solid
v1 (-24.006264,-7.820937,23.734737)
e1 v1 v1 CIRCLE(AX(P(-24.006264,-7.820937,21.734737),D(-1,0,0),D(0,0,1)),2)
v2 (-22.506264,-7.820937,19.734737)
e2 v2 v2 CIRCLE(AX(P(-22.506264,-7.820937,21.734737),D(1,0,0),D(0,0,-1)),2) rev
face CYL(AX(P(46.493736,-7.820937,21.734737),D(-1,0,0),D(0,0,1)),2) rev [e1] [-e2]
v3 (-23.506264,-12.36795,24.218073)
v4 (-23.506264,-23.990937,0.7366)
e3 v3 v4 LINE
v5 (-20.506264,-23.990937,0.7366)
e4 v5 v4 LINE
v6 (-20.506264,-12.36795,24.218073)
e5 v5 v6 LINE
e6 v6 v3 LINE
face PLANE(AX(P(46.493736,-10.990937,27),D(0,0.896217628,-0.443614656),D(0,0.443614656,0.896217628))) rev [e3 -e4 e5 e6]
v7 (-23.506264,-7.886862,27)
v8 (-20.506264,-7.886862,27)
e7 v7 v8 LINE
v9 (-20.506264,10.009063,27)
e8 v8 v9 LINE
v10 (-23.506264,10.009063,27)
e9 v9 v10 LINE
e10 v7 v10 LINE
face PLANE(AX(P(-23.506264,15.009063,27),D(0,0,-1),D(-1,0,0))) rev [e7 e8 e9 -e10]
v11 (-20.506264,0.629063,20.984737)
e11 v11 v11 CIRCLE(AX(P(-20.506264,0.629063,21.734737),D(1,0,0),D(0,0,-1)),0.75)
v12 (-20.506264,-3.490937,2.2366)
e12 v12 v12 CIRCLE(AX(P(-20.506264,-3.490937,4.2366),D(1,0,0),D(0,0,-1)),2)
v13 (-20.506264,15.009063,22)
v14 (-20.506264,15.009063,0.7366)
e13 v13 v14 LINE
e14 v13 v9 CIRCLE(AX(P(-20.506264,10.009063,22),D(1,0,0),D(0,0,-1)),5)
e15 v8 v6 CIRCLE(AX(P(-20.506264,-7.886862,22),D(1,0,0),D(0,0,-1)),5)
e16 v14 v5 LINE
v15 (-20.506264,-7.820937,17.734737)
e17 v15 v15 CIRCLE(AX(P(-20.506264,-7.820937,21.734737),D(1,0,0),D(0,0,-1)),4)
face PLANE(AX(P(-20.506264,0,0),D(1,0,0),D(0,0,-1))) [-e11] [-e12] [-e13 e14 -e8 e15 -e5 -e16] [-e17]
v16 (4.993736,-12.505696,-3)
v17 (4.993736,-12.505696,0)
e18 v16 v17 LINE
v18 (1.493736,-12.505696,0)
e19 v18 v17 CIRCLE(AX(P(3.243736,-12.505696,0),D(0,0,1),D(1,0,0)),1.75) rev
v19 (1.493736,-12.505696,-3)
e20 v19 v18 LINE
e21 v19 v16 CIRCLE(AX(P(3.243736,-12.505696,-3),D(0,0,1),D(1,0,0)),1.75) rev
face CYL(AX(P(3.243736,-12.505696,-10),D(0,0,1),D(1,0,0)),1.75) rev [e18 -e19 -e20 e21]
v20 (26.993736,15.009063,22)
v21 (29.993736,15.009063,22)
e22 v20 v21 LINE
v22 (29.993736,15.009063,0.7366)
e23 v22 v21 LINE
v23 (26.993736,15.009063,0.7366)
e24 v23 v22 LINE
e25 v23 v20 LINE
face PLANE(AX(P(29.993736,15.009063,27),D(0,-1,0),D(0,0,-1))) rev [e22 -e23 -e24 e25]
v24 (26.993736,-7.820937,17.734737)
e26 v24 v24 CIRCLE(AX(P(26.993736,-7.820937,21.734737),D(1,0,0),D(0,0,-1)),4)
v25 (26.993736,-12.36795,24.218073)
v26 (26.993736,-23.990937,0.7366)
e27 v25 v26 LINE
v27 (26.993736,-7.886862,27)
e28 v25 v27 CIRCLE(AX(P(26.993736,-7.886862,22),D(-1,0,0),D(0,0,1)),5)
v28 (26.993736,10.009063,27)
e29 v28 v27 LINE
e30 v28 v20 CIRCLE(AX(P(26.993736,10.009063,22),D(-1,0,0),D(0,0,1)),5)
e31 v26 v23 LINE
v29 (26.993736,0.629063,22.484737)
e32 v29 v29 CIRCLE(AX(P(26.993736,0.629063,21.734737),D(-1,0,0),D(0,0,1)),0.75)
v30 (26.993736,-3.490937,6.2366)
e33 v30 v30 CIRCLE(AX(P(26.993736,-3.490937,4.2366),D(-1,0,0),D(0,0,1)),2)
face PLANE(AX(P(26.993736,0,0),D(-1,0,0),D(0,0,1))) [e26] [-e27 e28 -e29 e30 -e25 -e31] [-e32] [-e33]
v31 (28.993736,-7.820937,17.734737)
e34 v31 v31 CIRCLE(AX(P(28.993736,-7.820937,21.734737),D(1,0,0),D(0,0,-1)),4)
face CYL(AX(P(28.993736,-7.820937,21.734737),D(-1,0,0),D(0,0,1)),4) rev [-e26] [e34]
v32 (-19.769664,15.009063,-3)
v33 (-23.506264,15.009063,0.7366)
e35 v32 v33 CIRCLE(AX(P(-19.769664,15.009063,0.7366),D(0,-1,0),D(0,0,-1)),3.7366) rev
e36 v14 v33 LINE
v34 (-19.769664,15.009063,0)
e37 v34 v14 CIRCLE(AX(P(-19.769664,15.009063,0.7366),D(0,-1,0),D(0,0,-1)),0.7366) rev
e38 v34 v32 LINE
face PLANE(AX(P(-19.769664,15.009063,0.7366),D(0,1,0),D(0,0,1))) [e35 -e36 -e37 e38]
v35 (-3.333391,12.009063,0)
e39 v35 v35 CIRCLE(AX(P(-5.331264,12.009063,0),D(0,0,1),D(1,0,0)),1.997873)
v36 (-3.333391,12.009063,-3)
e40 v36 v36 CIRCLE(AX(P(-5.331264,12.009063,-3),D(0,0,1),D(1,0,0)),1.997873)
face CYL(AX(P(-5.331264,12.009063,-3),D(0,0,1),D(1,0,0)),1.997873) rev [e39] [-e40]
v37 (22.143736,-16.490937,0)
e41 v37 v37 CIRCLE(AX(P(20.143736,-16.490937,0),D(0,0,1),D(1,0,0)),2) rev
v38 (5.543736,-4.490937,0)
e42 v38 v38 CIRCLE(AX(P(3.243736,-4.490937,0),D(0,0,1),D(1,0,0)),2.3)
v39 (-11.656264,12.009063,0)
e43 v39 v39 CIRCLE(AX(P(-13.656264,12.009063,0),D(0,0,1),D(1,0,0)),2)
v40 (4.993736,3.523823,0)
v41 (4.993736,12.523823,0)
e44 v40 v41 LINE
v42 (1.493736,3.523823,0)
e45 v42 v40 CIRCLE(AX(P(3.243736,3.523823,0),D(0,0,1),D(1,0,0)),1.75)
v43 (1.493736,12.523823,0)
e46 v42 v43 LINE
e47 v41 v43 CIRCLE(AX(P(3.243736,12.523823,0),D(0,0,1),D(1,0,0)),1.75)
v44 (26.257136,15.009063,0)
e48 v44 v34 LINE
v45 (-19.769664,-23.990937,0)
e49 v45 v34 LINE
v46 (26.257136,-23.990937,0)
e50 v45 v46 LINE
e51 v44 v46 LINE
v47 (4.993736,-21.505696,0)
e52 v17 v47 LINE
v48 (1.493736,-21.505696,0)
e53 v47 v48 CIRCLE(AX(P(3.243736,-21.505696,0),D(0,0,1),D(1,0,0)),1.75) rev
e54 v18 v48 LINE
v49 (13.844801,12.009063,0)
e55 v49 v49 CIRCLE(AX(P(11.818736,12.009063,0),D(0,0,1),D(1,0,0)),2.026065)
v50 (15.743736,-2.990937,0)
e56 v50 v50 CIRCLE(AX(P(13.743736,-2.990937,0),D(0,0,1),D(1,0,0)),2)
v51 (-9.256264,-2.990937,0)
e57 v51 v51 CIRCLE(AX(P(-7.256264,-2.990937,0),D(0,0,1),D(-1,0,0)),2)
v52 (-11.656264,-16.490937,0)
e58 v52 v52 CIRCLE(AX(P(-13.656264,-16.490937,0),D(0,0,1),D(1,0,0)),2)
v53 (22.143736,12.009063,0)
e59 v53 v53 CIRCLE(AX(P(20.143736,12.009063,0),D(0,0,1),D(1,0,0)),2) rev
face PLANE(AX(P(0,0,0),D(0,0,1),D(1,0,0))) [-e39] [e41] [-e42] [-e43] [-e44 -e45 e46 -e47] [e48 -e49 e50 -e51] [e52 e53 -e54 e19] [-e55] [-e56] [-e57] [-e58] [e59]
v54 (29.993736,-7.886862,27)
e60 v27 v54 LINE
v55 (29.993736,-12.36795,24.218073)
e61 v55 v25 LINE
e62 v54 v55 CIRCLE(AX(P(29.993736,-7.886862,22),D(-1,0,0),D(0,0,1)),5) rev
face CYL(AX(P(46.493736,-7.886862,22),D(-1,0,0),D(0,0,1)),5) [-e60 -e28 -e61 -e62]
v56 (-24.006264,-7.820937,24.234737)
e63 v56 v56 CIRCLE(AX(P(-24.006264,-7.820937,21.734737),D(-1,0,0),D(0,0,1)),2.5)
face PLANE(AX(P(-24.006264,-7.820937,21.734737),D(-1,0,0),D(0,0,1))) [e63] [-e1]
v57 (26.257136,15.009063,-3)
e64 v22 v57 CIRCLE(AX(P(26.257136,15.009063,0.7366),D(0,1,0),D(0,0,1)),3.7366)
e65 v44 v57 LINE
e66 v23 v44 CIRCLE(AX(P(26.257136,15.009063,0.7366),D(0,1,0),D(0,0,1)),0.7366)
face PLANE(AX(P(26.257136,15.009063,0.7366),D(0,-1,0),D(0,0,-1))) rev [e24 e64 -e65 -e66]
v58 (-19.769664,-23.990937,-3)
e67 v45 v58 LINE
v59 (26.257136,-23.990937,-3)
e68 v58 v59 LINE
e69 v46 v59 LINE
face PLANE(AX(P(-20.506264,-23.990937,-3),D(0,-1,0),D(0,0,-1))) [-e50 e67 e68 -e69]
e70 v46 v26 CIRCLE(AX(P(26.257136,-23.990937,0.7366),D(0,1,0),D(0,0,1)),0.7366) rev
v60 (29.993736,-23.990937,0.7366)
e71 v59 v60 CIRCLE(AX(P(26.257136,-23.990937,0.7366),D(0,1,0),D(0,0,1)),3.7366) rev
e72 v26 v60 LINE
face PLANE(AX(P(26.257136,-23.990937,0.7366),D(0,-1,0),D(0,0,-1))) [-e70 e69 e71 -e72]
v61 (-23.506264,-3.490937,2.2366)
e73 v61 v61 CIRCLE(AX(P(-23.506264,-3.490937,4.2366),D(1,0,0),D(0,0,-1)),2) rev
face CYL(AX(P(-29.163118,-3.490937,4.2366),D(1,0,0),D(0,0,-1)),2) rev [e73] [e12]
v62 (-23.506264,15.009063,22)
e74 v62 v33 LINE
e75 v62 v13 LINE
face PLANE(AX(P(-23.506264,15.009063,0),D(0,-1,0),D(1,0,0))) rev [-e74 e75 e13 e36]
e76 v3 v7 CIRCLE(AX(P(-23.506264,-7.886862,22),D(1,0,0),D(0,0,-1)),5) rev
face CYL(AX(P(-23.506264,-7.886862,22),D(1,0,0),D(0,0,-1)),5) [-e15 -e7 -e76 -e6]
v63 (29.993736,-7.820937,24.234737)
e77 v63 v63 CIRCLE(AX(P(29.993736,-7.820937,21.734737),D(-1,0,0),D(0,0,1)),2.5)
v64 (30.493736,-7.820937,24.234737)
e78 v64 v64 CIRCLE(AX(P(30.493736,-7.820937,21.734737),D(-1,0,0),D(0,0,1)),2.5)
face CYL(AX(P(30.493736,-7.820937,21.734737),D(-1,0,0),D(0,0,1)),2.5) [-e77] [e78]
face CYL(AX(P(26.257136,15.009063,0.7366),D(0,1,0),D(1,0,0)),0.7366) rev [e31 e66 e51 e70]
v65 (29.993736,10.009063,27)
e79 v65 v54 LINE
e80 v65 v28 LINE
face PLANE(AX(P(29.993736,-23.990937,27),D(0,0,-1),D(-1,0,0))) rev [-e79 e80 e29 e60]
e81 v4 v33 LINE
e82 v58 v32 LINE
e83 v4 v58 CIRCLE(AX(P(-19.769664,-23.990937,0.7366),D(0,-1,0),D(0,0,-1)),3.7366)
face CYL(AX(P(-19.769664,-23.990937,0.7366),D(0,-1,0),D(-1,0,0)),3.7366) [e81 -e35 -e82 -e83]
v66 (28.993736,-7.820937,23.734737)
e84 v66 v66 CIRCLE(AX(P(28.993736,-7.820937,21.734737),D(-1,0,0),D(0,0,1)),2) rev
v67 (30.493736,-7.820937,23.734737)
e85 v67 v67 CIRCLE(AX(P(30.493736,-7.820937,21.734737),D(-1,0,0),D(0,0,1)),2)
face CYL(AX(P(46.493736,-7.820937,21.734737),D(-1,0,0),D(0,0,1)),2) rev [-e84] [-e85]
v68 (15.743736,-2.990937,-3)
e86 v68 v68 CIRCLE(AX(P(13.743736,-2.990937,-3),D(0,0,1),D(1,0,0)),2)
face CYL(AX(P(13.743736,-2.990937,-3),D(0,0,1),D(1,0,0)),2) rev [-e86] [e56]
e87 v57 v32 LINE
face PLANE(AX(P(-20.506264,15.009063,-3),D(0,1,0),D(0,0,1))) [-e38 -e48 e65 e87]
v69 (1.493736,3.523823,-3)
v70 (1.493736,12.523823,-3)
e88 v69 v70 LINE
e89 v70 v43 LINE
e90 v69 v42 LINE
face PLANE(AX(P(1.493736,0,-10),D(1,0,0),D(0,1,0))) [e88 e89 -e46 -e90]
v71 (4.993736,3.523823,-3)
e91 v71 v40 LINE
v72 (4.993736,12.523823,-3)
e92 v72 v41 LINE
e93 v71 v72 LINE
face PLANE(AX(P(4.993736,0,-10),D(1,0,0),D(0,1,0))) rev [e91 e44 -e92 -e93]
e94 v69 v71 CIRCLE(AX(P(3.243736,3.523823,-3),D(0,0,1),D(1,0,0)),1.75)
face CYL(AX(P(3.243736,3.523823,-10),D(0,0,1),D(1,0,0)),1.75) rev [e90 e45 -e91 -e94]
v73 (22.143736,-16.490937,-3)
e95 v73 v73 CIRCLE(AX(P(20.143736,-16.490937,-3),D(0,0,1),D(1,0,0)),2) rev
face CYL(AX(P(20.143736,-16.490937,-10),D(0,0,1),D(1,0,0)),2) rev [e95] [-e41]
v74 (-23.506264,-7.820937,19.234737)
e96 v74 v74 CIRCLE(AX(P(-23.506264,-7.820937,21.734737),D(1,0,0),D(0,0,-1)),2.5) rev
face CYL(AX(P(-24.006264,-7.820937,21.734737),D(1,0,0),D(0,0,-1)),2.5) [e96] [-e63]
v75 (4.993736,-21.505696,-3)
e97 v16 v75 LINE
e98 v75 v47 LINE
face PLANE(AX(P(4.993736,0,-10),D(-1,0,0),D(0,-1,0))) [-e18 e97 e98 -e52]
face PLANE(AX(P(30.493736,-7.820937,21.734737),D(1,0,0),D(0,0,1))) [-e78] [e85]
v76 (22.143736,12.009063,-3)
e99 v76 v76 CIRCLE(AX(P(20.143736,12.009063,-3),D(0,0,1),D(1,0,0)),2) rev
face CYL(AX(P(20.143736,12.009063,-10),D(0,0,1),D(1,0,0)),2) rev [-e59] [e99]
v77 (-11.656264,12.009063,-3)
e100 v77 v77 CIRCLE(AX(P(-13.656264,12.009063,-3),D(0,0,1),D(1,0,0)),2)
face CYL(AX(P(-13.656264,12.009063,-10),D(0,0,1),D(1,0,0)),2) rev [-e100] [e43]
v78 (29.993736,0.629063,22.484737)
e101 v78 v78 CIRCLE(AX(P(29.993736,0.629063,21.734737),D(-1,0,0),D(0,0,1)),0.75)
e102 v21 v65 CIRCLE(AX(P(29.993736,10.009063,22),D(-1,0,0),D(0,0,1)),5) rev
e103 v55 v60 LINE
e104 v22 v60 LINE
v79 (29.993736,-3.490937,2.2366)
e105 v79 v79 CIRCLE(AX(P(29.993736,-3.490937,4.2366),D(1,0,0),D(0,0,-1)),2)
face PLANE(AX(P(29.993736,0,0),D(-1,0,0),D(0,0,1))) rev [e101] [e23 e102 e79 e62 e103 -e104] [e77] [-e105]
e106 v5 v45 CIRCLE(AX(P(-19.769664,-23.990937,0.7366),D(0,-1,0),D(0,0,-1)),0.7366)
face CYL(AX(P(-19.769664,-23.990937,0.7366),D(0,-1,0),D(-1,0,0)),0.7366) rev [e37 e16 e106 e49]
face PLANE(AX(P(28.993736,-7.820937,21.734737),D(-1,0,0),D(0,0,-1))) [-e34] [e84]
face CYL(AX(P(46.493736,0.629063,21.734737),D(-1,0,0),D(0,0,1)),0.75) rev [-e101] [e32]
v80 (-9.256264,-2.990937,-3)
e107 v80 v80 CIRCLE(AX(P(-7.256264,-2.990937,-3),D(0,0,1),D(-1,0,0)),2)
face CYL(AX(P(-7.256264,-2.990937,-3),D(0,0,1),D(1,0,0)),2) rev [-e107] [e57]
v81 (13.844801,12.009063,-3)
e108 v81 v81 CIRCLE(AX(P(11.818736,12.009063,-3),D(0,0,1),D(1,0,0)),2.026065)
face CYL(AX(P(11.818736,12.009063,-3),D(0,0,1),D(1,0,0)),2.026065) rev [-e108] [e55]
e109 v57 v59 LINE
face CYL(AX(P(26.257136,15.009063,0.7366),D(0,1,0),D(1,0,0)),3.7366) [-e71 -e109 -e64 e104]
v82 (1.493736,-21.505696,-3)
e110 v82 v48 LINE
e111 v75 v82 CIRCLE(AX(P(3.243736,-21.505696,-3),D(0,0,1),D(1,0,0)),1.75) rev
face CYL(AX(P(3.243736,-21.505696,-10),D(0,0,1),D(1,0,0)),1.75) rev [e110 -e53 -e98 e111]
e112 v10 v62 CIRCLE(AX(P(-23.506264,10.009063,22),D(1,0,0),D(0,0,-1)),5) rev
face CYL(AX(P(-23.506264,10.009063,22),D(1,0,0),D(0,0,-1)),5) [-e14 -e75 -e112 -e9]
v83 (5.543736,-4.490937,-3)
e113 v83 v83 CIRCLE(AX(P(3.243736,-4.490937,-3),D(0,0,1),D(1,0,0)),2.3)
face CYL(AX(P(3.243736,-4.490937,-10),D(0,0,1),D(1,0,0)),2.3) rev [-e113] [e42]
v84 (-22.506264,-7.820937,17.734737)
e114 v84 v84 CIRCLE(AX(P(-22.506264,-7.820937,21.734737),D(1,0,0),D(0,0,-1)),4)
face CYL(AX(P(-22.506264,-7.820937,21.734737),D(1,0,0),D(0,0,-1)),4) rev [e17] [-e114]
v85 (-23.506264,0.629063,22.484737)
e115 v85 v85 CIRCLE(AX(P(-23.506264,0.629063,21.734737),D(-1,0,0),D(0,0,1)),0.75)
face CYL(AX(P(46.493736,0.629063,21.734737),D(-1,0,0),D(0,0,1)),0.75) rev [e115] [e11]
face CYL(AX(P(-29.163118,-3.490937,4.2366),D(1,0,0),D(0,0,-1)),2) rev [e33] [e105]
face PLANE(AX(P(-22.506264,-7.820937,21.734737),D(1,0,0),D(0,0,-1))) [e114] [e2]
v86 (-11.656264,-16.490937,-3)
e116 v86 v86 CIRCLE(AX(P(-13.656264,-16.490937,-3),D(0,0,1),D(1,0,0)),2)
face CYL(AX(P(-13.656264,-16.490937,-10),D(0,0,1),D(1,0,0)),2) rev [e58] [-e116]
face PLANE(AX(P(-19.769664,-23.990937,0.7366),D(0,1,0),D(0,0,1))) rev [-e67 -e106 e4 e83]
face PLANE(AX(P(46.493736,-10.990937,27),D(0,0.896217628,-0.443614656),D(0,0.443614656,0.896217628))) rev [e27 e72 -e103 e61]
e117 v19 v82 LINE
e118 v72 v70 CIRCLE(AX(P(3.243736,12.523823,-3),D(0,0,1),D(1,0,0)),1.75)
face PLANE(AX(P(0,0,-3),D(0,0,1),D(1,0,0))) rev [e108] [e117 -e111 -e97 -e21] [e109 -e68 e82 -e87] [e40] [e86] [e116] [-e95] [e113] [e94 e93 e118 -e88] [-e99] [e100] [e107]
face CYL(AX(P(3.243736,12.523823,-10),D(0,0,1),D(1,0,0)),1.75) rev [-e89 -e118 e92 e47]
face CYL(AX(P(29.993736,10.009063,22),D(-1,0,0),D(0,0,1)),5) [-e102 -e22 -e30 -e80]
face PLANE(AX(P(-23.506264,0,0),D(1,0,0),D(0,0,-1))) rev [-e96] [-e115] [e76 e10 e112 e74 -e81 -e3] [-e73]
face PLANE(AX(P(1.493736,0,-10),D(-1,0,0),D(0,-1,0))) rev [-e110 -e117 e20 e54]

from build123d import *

# Parameters (mm, degrees)
ESBO_O1_W                        = 47.5
ESBO_O1_H                        = 39
FLANGE_BASE1_DEPTH               = 3
ESBO_O6_R                        = 2.3
CORTE_EXTRUS_O1_DEPTH            = 10
ARESTA_FLANGE1_STRIP_W           = 13.4732
ARESTA_FLANGE1_STRIP_H           = 3
ARESTA_FLANGE1_STRIP_CUT_DEPTH   = 39
ARESTA_FLANGE1_STRIP_2_W         = 13.4732
ARESTA_FLANGE1_STRIP_2_H         = 3
ARESTA_FLANGE1_STRIP_CUT_2_DEPTH = 39
ARESTA_FLANGE1_DEPTH             = 39
ARESTA_FLANGE1_BEND_DEPTH        = 39
ESBO_O13_R                       = 2
ESBO_O13_R_2                     = 0.75
CORTE_EXTRUS_O2_DEPTH            = 70
FILETE1_R                        = 5
ESBO_O14_R                       = 1.997873176
ESBO_O14_R_2                     = 2.026064888
ESBO_O14_R_3                     = 2
CORTE_EXTRUS_O4_DEPTH            = 3
BOSS_EXTRUDE1_START              = 0.5
SKETCH1_R                        = 2.5
SKETCH1_R_2                      = 2
BOSS_EXTRUDE1_DEPTH              = 0.5
SKETCH2_R                        = 4
CUT_EXTRUDE8_DEPTH               = 2
CORTE_EXTRUS_O5_REACH            = 66.966
ESBO_O15_R                       = 2


# Sheet-metal steps are written as plain solids
with BuildPart() as part:
    # Esboço1 → Flange-base1 (new body)
    with BuildSketch(Plane.XY):
        with Locations((3.243735783, -4.490936556)):
            Rectangle(ESBO_O1_W, ESBO_O1_H)
    extrude(amount=-FLANGE_BASE1_DEPTH)

    # Esboço6 → Corte-extrusão1 (cut)
    with BuildSketch(Plane.XY):
        with BuildLine():
            Line((-13.656264217, 10.009063444), (-13.656264217, 12.009063444))
            Line((-13.656264217, 12.009063444), (-11.656264217, 12.009063444))
            ThreePointArc((-11.656264217, 12.009063444), (-15.070477779, 13.423277006), (-13.656264217, 10.009063444))
        make_face()
        with BuildLine():
            Line((-11.656264217, 12.009063444), (-13.656264217, 12.009063444))
            Line((-13.656264217, 12.009063444), (-13.656264217, 10.009063444))
            ThreePointArc((-13.656264217, 10.009063444), (-12.242050654, 10.594849882), (-11.656264217, 12.009063444))
        make_face()
        with BuildLine():
            ThreePointArc((-11.656264217, -16.490936556), (-12.242050654, -15.076722994), (-13.656264217, -14.490936556))
            Line((-13.656264217, -14.490936556), (-13.656264217, -16.490936556))
            Line((-13.656264217, -16.490936556), (-11.656264217, -16.490936556))
        make_face()
        with BuildLine():
            Line((-13.656264217, -16.490936556), (-13.656264217, -14.490936556))
            ThreePointArc((-13.656264217, -14.490936556), (-15.070477779, -17.905150118), (-11.656264217, -16.490936556))
            Line((-11.656264217, -16.490936556), (-13.656264217, -16.490936556))
        make_face()
        with Locations((3.243735783, -4.490936556)):
            Circle(ESBO_O6_R)
        with BuildLine():
            Line((4.993735783, 12.009063444), (1.493735783, 12.009063444))
            Line((1.493735783, 12.009063444), (1.493735783, 3.523823043))
            ThreePointArc((1.493735783, 3.523823043), (3.243735783, 1.773823043), (4.993735783, 3.523823043))
            Line((4.993735783, 3.523823043), (4.993735783, 12.009063444))
        make_face()
        with BuildLine():
            Line((1.493735783, 12.523823043), (1.493735783, 12.009063444))
            Line((1.493735783, 12.009063444), (4.993735783, 12.009063444))
            Line((4.993735783, 12.009063444), (4.993735783, 12.523823043))
            ThreePointArc((4.993735783, 12.523823043), (3.243735783, 14.273823043), (1.493735783, 12.523823043))
        make_face()
        with BuildLine():
            Line((1.493735783, -12.505696155), (1.493735783, -16.490936556))
            Line((1.493735783, -16.490936556), (4.993735783, -16.490936556))
            Line((4.993735783, -16.490936556), (4.993735783, -12.505696155))
            ThreePointArc((4.993735783, -12.505696155), (3.243735783, -10.755696155), (1.493735783, -12.505696155))
        make_face()
        with BuildLine():
            Line((4.993735783, -16.490936556), (1.493735783, -16.490936556))
            Line((1.493735783, -16.490936556), (1.493735783, -21.505696155))
            ThreePointArc((1.493735783, -21.505696155), (3.243735783, -23.255696155), (4.993735783, -21.505696155))
            Line((4.993735783, -21.505696155), (4.993735783, -16.490936556))
        make_face()
        with BuildLine():
            ThreePointArc((22.143735783, -16.490936556), (21.557949346, -15.076722994), (20.143735783, -14.490936556))
            Line((20.143735783, -14.490936556), (20.143735783, -16.490936556))
            Line((20.143735783, -16.490936556), (18.143735783, -16.490936556))
            ThreePointArc((18.143735783, -16.490936556), (20.143735783, -18.490936556), (22.143735783, -16.490936556))
        make_face()
        with BuildLine():
            Line((20.143735783, -16.490936556), (20.143735783, -14.490936556))
            ThreePointArc((20.143735783, -14.490936556), (18.729522221, -15.076722994), (18.143735783, -16.490936556))
            Line((18.143735783, -16.490936556), (20.143735783, -16.490936556))
        make_face()
        with BuildLine():
            ThreePointArc((22.143735783, 12.009063444), (20.143735783, 14.009063444), (18.143735783, 12.009063444))
            Line((18.143735783, 12.009063444), (20.143735783, 12.009063444))
            Line((20.143735783, 12.009063444), (20.143735783, 10.009063444))
            ThreePointArc((20.143735783, 10.009063444), (21.557949346, 10.594849882), (22.143735783, 12.009063444))
        make_face()
        with BuildLine():
            Line((20.143735783, 12.009063444), (18.143735783, 12.009063444))
            ThreePointArc((18.143735783, 12.009063444), (18.729522221, 10.594849882), (20.143735783, 10.009063444))
            Line((20.143735783, 10.009063444), (20.143735783, 12.009063444))
        make_face()
    extrude(amount=-CORTE_EXTRUS_O1_DEPTH, mode=Mode.SUBTRACT)

    # Aresta-Flange1 strip (across the edge) → Aresta-Flange1 strip cut (cut)
    with BuildSketch(Plane(origin=(26.993735783, -23.990936556, 0), x_dir=(-1, 0, 0), z_dir=(0, 1, 0))):
        with Locations((-6, -1.5)):
            Rectangle(ARESTA_FLANGE1_STRIP_W, ARESTA_FLANGE1_STRIP_H)
    extrude(amount=ARESTA_FLANGE1_STRIP_CUT_DEPTH, mode=Mode.SUBTRACT)

    # Aresta-Flange1 strip 2 (across the edge) → Aresta-Flange1 strip cut 2 (cut)
    with BuildSketch(Plane(origin=(-20.506264217, 15.009063444, 0), x_dir=(1, 0, 0), z_dir=(0, -1, 0))):
        with Locations((-6, -1.5)):
            Rectangle(ARESTA_FLANGE1_STRIP_2_W, ARESTA_FLANGE1_STRIP_2_H)
    extrude(amount=ARESTA_FLANGE1_STRIP_CUT_2_DEPTH, mode=Mode.SUBTRACT)

    # Aresta-Flange1 section (across the edge) → Aresta-Flange1 (add)
    with BuildSketch(Plane(origin=(26.993735783, -23.990936556, 0), x_dir=(-1, 0, 0), z_dir=(0, 1, 0))):
        with BuildLine():
            Line((-3, 0.7366), (-3, 27))
            Line((-3, 27), (0, 27))
            Line((0, 27), (0, 0.7366))
            ThreePointArc((0, 0.7366), (0.215745145, 0.215745145), (0.7366, 0))
            Line((0.7366, 0), (0.7366, -3))
            ThreePointArc((0.7366, -3), (-1.905575199, -1.905575199), (-3, 0.7366))
        make_face()
    extrude(amount=ARESTA_FLANGE1_DEPTH)

    # Aresta-Flange1 section 2 (across the edge) → Aresta-Flange1 bend (add)
    with BuildSketch(Plane(origin=(-20.506264217, 15.009063444, 0), x_dir=(1, 0, 0), z_dir=(0, -1, 0))):
        with BuildLine():
            Line((-3, 0.7366), (-3, 27))
            Line((-3, 27), (0, 27))
            Line((0, 27), (0, 0.7366))
            ThreePointArc((0, 0.7366), (0.215745145, 0.215745145), (0.7366, 0))
            Line((0.7366, 0), (0.7366, -3))
            ThreePointArc((0.7366, -3), (-1.905575199, -1.905575199), (-3, 0.7366))
        make_face()
    extrude(amount=ARESTA_FLANGE1_BEND_DEPTH)

    # Esboço13 → Corte-extrusão2 (cut)
    with BuildSketch(Plane.ZY.offset(23.506264217)):
        with Locations((21.734737, -7.820936556)):
            Circle(ESBO_O13_R)
        with Locations((21.734737, 0.629063444)):
            Circle(ESBO_O13_R_2)
        Polygon((0.7366, -23.990936556), (27, -23.990936556), (27, -10.990936556), align=None)
    extrude(amount=-CORTE_EXTRUS_O2_DEPTH, mode=Mode.SUBTRACT)

    # Filete1
    filete1_edges = [part.edges().sort_by_distance(p)[0] for p in [
        (28.493735783, 15.009063444, 27),
        (-22.006264217, 15.009063444, 27),
        (-22.006264217, -10.990936556, 27),
        (28.493735783, -10.990936556, 27),
    ]]
    fillet(filete1_edges, radius=FILETE1_R)

    # Esboço14 → Corte-extrusão4 (cut)
    with BuildSketch(Plane.XY):
        with Locations((-5.331264217, 12.009063444)):
            Circle(ESBO_O14_R)
        with Locations((11.818735783, 12.009063444)):
            Circle(ESBO_O14_R_2)
        with Locations((13.743735783, -2.990936556)):
            Circle(ESBO_O14_R_3)
        with Locations(Location((-7.256264217, -2.990936556, 0), (0, 0, 180))):
            Circle(ESBO_O14_R_3)
    extrude(amount=-CORTE_EXTRUS_O4_DEPTH, mode=Mode.SUBTRACT)

    # Sketch1 → Boss-Extrude1 (add)
    with BuildSketch(Plane.ZY.offset(23.506264217).offset(BOSS_EXTRUDE1_START)):
        with Locations(Location((21.734737, -7.820936556, 0), (0, 0, 180))):
            Circle(SKETCH1_R)
        with Locations((21.734737, -7.820936556)):
            Circle(SKETCH1_R_2, mode=Mode.SUBTRACT)
    boss_extrude1 = extrude(amount=-BOSS_EXTRUDE1_DEPTH)

    # Sketch2 → Cut-Extrude8 (cut)
    with BuildSketch(Plane(origin=(-20.506264217, 0, 0), x_dir=(0, 0, -1), z_dir=(1, 0, 0))):
        with Locations((-21.734737, -7.820936556)):
            Circle(SKETCH2_R)
    cut_extrude8 = extrude(amount=-CUT_EXTRUDE8_DEPTH, mode=Mode.SUBTRACT)

    # Mirror1: Boss-Extrude1, Cut-Extrude8 across plane
    add(boss_extrude1.mirror(Plane.ZY.offset(-3.243735783)))
    add(cut_extrude8.mirror(Plane.ZY.offset(-3.243735783)), mode=Mode.SUBTRACT)

    # Corte-extrusão5: up to this face of the body (flat: up to its plane)
    corte_extrus_o5_end = Plane(part.part.faces().sort_by_distance((-23.506264217, -1.392336246, 12.655784695))[0])
    # Esboço15 → Corte-extrusão5 (cut, up to the picked face)
    with BuildSketch(Plane(origin=(29.993735783, 0, 0), x_dir=(0, 0, -1), z_dir=(1, 0, 0)), mode=Mode.PRIVATE) as corte_extrus_o5_sk1:
        with Locations((-4.2366, -3.490936556)):
            Circle(ESBO_O15_R)
    corte_extrus_o5_tool1 = split(extrude(corte_extrus_o5_sk1.sketch, amount=-CORTE_EXTRUS_O5_REACH, mode=Mode.PRIVATE), bisect_by=corte_extrus_o5_end, keep=Keep.BOTH, mode=Mode.PRIVATE)
    add(corte_extrus_o5_tool1.solids().sort_by(Axis((29.993736, -3.490937, 4.2366), (-1, 0, 0)))[0], mode=Mode.SUBTRACT)


solid = part.part
